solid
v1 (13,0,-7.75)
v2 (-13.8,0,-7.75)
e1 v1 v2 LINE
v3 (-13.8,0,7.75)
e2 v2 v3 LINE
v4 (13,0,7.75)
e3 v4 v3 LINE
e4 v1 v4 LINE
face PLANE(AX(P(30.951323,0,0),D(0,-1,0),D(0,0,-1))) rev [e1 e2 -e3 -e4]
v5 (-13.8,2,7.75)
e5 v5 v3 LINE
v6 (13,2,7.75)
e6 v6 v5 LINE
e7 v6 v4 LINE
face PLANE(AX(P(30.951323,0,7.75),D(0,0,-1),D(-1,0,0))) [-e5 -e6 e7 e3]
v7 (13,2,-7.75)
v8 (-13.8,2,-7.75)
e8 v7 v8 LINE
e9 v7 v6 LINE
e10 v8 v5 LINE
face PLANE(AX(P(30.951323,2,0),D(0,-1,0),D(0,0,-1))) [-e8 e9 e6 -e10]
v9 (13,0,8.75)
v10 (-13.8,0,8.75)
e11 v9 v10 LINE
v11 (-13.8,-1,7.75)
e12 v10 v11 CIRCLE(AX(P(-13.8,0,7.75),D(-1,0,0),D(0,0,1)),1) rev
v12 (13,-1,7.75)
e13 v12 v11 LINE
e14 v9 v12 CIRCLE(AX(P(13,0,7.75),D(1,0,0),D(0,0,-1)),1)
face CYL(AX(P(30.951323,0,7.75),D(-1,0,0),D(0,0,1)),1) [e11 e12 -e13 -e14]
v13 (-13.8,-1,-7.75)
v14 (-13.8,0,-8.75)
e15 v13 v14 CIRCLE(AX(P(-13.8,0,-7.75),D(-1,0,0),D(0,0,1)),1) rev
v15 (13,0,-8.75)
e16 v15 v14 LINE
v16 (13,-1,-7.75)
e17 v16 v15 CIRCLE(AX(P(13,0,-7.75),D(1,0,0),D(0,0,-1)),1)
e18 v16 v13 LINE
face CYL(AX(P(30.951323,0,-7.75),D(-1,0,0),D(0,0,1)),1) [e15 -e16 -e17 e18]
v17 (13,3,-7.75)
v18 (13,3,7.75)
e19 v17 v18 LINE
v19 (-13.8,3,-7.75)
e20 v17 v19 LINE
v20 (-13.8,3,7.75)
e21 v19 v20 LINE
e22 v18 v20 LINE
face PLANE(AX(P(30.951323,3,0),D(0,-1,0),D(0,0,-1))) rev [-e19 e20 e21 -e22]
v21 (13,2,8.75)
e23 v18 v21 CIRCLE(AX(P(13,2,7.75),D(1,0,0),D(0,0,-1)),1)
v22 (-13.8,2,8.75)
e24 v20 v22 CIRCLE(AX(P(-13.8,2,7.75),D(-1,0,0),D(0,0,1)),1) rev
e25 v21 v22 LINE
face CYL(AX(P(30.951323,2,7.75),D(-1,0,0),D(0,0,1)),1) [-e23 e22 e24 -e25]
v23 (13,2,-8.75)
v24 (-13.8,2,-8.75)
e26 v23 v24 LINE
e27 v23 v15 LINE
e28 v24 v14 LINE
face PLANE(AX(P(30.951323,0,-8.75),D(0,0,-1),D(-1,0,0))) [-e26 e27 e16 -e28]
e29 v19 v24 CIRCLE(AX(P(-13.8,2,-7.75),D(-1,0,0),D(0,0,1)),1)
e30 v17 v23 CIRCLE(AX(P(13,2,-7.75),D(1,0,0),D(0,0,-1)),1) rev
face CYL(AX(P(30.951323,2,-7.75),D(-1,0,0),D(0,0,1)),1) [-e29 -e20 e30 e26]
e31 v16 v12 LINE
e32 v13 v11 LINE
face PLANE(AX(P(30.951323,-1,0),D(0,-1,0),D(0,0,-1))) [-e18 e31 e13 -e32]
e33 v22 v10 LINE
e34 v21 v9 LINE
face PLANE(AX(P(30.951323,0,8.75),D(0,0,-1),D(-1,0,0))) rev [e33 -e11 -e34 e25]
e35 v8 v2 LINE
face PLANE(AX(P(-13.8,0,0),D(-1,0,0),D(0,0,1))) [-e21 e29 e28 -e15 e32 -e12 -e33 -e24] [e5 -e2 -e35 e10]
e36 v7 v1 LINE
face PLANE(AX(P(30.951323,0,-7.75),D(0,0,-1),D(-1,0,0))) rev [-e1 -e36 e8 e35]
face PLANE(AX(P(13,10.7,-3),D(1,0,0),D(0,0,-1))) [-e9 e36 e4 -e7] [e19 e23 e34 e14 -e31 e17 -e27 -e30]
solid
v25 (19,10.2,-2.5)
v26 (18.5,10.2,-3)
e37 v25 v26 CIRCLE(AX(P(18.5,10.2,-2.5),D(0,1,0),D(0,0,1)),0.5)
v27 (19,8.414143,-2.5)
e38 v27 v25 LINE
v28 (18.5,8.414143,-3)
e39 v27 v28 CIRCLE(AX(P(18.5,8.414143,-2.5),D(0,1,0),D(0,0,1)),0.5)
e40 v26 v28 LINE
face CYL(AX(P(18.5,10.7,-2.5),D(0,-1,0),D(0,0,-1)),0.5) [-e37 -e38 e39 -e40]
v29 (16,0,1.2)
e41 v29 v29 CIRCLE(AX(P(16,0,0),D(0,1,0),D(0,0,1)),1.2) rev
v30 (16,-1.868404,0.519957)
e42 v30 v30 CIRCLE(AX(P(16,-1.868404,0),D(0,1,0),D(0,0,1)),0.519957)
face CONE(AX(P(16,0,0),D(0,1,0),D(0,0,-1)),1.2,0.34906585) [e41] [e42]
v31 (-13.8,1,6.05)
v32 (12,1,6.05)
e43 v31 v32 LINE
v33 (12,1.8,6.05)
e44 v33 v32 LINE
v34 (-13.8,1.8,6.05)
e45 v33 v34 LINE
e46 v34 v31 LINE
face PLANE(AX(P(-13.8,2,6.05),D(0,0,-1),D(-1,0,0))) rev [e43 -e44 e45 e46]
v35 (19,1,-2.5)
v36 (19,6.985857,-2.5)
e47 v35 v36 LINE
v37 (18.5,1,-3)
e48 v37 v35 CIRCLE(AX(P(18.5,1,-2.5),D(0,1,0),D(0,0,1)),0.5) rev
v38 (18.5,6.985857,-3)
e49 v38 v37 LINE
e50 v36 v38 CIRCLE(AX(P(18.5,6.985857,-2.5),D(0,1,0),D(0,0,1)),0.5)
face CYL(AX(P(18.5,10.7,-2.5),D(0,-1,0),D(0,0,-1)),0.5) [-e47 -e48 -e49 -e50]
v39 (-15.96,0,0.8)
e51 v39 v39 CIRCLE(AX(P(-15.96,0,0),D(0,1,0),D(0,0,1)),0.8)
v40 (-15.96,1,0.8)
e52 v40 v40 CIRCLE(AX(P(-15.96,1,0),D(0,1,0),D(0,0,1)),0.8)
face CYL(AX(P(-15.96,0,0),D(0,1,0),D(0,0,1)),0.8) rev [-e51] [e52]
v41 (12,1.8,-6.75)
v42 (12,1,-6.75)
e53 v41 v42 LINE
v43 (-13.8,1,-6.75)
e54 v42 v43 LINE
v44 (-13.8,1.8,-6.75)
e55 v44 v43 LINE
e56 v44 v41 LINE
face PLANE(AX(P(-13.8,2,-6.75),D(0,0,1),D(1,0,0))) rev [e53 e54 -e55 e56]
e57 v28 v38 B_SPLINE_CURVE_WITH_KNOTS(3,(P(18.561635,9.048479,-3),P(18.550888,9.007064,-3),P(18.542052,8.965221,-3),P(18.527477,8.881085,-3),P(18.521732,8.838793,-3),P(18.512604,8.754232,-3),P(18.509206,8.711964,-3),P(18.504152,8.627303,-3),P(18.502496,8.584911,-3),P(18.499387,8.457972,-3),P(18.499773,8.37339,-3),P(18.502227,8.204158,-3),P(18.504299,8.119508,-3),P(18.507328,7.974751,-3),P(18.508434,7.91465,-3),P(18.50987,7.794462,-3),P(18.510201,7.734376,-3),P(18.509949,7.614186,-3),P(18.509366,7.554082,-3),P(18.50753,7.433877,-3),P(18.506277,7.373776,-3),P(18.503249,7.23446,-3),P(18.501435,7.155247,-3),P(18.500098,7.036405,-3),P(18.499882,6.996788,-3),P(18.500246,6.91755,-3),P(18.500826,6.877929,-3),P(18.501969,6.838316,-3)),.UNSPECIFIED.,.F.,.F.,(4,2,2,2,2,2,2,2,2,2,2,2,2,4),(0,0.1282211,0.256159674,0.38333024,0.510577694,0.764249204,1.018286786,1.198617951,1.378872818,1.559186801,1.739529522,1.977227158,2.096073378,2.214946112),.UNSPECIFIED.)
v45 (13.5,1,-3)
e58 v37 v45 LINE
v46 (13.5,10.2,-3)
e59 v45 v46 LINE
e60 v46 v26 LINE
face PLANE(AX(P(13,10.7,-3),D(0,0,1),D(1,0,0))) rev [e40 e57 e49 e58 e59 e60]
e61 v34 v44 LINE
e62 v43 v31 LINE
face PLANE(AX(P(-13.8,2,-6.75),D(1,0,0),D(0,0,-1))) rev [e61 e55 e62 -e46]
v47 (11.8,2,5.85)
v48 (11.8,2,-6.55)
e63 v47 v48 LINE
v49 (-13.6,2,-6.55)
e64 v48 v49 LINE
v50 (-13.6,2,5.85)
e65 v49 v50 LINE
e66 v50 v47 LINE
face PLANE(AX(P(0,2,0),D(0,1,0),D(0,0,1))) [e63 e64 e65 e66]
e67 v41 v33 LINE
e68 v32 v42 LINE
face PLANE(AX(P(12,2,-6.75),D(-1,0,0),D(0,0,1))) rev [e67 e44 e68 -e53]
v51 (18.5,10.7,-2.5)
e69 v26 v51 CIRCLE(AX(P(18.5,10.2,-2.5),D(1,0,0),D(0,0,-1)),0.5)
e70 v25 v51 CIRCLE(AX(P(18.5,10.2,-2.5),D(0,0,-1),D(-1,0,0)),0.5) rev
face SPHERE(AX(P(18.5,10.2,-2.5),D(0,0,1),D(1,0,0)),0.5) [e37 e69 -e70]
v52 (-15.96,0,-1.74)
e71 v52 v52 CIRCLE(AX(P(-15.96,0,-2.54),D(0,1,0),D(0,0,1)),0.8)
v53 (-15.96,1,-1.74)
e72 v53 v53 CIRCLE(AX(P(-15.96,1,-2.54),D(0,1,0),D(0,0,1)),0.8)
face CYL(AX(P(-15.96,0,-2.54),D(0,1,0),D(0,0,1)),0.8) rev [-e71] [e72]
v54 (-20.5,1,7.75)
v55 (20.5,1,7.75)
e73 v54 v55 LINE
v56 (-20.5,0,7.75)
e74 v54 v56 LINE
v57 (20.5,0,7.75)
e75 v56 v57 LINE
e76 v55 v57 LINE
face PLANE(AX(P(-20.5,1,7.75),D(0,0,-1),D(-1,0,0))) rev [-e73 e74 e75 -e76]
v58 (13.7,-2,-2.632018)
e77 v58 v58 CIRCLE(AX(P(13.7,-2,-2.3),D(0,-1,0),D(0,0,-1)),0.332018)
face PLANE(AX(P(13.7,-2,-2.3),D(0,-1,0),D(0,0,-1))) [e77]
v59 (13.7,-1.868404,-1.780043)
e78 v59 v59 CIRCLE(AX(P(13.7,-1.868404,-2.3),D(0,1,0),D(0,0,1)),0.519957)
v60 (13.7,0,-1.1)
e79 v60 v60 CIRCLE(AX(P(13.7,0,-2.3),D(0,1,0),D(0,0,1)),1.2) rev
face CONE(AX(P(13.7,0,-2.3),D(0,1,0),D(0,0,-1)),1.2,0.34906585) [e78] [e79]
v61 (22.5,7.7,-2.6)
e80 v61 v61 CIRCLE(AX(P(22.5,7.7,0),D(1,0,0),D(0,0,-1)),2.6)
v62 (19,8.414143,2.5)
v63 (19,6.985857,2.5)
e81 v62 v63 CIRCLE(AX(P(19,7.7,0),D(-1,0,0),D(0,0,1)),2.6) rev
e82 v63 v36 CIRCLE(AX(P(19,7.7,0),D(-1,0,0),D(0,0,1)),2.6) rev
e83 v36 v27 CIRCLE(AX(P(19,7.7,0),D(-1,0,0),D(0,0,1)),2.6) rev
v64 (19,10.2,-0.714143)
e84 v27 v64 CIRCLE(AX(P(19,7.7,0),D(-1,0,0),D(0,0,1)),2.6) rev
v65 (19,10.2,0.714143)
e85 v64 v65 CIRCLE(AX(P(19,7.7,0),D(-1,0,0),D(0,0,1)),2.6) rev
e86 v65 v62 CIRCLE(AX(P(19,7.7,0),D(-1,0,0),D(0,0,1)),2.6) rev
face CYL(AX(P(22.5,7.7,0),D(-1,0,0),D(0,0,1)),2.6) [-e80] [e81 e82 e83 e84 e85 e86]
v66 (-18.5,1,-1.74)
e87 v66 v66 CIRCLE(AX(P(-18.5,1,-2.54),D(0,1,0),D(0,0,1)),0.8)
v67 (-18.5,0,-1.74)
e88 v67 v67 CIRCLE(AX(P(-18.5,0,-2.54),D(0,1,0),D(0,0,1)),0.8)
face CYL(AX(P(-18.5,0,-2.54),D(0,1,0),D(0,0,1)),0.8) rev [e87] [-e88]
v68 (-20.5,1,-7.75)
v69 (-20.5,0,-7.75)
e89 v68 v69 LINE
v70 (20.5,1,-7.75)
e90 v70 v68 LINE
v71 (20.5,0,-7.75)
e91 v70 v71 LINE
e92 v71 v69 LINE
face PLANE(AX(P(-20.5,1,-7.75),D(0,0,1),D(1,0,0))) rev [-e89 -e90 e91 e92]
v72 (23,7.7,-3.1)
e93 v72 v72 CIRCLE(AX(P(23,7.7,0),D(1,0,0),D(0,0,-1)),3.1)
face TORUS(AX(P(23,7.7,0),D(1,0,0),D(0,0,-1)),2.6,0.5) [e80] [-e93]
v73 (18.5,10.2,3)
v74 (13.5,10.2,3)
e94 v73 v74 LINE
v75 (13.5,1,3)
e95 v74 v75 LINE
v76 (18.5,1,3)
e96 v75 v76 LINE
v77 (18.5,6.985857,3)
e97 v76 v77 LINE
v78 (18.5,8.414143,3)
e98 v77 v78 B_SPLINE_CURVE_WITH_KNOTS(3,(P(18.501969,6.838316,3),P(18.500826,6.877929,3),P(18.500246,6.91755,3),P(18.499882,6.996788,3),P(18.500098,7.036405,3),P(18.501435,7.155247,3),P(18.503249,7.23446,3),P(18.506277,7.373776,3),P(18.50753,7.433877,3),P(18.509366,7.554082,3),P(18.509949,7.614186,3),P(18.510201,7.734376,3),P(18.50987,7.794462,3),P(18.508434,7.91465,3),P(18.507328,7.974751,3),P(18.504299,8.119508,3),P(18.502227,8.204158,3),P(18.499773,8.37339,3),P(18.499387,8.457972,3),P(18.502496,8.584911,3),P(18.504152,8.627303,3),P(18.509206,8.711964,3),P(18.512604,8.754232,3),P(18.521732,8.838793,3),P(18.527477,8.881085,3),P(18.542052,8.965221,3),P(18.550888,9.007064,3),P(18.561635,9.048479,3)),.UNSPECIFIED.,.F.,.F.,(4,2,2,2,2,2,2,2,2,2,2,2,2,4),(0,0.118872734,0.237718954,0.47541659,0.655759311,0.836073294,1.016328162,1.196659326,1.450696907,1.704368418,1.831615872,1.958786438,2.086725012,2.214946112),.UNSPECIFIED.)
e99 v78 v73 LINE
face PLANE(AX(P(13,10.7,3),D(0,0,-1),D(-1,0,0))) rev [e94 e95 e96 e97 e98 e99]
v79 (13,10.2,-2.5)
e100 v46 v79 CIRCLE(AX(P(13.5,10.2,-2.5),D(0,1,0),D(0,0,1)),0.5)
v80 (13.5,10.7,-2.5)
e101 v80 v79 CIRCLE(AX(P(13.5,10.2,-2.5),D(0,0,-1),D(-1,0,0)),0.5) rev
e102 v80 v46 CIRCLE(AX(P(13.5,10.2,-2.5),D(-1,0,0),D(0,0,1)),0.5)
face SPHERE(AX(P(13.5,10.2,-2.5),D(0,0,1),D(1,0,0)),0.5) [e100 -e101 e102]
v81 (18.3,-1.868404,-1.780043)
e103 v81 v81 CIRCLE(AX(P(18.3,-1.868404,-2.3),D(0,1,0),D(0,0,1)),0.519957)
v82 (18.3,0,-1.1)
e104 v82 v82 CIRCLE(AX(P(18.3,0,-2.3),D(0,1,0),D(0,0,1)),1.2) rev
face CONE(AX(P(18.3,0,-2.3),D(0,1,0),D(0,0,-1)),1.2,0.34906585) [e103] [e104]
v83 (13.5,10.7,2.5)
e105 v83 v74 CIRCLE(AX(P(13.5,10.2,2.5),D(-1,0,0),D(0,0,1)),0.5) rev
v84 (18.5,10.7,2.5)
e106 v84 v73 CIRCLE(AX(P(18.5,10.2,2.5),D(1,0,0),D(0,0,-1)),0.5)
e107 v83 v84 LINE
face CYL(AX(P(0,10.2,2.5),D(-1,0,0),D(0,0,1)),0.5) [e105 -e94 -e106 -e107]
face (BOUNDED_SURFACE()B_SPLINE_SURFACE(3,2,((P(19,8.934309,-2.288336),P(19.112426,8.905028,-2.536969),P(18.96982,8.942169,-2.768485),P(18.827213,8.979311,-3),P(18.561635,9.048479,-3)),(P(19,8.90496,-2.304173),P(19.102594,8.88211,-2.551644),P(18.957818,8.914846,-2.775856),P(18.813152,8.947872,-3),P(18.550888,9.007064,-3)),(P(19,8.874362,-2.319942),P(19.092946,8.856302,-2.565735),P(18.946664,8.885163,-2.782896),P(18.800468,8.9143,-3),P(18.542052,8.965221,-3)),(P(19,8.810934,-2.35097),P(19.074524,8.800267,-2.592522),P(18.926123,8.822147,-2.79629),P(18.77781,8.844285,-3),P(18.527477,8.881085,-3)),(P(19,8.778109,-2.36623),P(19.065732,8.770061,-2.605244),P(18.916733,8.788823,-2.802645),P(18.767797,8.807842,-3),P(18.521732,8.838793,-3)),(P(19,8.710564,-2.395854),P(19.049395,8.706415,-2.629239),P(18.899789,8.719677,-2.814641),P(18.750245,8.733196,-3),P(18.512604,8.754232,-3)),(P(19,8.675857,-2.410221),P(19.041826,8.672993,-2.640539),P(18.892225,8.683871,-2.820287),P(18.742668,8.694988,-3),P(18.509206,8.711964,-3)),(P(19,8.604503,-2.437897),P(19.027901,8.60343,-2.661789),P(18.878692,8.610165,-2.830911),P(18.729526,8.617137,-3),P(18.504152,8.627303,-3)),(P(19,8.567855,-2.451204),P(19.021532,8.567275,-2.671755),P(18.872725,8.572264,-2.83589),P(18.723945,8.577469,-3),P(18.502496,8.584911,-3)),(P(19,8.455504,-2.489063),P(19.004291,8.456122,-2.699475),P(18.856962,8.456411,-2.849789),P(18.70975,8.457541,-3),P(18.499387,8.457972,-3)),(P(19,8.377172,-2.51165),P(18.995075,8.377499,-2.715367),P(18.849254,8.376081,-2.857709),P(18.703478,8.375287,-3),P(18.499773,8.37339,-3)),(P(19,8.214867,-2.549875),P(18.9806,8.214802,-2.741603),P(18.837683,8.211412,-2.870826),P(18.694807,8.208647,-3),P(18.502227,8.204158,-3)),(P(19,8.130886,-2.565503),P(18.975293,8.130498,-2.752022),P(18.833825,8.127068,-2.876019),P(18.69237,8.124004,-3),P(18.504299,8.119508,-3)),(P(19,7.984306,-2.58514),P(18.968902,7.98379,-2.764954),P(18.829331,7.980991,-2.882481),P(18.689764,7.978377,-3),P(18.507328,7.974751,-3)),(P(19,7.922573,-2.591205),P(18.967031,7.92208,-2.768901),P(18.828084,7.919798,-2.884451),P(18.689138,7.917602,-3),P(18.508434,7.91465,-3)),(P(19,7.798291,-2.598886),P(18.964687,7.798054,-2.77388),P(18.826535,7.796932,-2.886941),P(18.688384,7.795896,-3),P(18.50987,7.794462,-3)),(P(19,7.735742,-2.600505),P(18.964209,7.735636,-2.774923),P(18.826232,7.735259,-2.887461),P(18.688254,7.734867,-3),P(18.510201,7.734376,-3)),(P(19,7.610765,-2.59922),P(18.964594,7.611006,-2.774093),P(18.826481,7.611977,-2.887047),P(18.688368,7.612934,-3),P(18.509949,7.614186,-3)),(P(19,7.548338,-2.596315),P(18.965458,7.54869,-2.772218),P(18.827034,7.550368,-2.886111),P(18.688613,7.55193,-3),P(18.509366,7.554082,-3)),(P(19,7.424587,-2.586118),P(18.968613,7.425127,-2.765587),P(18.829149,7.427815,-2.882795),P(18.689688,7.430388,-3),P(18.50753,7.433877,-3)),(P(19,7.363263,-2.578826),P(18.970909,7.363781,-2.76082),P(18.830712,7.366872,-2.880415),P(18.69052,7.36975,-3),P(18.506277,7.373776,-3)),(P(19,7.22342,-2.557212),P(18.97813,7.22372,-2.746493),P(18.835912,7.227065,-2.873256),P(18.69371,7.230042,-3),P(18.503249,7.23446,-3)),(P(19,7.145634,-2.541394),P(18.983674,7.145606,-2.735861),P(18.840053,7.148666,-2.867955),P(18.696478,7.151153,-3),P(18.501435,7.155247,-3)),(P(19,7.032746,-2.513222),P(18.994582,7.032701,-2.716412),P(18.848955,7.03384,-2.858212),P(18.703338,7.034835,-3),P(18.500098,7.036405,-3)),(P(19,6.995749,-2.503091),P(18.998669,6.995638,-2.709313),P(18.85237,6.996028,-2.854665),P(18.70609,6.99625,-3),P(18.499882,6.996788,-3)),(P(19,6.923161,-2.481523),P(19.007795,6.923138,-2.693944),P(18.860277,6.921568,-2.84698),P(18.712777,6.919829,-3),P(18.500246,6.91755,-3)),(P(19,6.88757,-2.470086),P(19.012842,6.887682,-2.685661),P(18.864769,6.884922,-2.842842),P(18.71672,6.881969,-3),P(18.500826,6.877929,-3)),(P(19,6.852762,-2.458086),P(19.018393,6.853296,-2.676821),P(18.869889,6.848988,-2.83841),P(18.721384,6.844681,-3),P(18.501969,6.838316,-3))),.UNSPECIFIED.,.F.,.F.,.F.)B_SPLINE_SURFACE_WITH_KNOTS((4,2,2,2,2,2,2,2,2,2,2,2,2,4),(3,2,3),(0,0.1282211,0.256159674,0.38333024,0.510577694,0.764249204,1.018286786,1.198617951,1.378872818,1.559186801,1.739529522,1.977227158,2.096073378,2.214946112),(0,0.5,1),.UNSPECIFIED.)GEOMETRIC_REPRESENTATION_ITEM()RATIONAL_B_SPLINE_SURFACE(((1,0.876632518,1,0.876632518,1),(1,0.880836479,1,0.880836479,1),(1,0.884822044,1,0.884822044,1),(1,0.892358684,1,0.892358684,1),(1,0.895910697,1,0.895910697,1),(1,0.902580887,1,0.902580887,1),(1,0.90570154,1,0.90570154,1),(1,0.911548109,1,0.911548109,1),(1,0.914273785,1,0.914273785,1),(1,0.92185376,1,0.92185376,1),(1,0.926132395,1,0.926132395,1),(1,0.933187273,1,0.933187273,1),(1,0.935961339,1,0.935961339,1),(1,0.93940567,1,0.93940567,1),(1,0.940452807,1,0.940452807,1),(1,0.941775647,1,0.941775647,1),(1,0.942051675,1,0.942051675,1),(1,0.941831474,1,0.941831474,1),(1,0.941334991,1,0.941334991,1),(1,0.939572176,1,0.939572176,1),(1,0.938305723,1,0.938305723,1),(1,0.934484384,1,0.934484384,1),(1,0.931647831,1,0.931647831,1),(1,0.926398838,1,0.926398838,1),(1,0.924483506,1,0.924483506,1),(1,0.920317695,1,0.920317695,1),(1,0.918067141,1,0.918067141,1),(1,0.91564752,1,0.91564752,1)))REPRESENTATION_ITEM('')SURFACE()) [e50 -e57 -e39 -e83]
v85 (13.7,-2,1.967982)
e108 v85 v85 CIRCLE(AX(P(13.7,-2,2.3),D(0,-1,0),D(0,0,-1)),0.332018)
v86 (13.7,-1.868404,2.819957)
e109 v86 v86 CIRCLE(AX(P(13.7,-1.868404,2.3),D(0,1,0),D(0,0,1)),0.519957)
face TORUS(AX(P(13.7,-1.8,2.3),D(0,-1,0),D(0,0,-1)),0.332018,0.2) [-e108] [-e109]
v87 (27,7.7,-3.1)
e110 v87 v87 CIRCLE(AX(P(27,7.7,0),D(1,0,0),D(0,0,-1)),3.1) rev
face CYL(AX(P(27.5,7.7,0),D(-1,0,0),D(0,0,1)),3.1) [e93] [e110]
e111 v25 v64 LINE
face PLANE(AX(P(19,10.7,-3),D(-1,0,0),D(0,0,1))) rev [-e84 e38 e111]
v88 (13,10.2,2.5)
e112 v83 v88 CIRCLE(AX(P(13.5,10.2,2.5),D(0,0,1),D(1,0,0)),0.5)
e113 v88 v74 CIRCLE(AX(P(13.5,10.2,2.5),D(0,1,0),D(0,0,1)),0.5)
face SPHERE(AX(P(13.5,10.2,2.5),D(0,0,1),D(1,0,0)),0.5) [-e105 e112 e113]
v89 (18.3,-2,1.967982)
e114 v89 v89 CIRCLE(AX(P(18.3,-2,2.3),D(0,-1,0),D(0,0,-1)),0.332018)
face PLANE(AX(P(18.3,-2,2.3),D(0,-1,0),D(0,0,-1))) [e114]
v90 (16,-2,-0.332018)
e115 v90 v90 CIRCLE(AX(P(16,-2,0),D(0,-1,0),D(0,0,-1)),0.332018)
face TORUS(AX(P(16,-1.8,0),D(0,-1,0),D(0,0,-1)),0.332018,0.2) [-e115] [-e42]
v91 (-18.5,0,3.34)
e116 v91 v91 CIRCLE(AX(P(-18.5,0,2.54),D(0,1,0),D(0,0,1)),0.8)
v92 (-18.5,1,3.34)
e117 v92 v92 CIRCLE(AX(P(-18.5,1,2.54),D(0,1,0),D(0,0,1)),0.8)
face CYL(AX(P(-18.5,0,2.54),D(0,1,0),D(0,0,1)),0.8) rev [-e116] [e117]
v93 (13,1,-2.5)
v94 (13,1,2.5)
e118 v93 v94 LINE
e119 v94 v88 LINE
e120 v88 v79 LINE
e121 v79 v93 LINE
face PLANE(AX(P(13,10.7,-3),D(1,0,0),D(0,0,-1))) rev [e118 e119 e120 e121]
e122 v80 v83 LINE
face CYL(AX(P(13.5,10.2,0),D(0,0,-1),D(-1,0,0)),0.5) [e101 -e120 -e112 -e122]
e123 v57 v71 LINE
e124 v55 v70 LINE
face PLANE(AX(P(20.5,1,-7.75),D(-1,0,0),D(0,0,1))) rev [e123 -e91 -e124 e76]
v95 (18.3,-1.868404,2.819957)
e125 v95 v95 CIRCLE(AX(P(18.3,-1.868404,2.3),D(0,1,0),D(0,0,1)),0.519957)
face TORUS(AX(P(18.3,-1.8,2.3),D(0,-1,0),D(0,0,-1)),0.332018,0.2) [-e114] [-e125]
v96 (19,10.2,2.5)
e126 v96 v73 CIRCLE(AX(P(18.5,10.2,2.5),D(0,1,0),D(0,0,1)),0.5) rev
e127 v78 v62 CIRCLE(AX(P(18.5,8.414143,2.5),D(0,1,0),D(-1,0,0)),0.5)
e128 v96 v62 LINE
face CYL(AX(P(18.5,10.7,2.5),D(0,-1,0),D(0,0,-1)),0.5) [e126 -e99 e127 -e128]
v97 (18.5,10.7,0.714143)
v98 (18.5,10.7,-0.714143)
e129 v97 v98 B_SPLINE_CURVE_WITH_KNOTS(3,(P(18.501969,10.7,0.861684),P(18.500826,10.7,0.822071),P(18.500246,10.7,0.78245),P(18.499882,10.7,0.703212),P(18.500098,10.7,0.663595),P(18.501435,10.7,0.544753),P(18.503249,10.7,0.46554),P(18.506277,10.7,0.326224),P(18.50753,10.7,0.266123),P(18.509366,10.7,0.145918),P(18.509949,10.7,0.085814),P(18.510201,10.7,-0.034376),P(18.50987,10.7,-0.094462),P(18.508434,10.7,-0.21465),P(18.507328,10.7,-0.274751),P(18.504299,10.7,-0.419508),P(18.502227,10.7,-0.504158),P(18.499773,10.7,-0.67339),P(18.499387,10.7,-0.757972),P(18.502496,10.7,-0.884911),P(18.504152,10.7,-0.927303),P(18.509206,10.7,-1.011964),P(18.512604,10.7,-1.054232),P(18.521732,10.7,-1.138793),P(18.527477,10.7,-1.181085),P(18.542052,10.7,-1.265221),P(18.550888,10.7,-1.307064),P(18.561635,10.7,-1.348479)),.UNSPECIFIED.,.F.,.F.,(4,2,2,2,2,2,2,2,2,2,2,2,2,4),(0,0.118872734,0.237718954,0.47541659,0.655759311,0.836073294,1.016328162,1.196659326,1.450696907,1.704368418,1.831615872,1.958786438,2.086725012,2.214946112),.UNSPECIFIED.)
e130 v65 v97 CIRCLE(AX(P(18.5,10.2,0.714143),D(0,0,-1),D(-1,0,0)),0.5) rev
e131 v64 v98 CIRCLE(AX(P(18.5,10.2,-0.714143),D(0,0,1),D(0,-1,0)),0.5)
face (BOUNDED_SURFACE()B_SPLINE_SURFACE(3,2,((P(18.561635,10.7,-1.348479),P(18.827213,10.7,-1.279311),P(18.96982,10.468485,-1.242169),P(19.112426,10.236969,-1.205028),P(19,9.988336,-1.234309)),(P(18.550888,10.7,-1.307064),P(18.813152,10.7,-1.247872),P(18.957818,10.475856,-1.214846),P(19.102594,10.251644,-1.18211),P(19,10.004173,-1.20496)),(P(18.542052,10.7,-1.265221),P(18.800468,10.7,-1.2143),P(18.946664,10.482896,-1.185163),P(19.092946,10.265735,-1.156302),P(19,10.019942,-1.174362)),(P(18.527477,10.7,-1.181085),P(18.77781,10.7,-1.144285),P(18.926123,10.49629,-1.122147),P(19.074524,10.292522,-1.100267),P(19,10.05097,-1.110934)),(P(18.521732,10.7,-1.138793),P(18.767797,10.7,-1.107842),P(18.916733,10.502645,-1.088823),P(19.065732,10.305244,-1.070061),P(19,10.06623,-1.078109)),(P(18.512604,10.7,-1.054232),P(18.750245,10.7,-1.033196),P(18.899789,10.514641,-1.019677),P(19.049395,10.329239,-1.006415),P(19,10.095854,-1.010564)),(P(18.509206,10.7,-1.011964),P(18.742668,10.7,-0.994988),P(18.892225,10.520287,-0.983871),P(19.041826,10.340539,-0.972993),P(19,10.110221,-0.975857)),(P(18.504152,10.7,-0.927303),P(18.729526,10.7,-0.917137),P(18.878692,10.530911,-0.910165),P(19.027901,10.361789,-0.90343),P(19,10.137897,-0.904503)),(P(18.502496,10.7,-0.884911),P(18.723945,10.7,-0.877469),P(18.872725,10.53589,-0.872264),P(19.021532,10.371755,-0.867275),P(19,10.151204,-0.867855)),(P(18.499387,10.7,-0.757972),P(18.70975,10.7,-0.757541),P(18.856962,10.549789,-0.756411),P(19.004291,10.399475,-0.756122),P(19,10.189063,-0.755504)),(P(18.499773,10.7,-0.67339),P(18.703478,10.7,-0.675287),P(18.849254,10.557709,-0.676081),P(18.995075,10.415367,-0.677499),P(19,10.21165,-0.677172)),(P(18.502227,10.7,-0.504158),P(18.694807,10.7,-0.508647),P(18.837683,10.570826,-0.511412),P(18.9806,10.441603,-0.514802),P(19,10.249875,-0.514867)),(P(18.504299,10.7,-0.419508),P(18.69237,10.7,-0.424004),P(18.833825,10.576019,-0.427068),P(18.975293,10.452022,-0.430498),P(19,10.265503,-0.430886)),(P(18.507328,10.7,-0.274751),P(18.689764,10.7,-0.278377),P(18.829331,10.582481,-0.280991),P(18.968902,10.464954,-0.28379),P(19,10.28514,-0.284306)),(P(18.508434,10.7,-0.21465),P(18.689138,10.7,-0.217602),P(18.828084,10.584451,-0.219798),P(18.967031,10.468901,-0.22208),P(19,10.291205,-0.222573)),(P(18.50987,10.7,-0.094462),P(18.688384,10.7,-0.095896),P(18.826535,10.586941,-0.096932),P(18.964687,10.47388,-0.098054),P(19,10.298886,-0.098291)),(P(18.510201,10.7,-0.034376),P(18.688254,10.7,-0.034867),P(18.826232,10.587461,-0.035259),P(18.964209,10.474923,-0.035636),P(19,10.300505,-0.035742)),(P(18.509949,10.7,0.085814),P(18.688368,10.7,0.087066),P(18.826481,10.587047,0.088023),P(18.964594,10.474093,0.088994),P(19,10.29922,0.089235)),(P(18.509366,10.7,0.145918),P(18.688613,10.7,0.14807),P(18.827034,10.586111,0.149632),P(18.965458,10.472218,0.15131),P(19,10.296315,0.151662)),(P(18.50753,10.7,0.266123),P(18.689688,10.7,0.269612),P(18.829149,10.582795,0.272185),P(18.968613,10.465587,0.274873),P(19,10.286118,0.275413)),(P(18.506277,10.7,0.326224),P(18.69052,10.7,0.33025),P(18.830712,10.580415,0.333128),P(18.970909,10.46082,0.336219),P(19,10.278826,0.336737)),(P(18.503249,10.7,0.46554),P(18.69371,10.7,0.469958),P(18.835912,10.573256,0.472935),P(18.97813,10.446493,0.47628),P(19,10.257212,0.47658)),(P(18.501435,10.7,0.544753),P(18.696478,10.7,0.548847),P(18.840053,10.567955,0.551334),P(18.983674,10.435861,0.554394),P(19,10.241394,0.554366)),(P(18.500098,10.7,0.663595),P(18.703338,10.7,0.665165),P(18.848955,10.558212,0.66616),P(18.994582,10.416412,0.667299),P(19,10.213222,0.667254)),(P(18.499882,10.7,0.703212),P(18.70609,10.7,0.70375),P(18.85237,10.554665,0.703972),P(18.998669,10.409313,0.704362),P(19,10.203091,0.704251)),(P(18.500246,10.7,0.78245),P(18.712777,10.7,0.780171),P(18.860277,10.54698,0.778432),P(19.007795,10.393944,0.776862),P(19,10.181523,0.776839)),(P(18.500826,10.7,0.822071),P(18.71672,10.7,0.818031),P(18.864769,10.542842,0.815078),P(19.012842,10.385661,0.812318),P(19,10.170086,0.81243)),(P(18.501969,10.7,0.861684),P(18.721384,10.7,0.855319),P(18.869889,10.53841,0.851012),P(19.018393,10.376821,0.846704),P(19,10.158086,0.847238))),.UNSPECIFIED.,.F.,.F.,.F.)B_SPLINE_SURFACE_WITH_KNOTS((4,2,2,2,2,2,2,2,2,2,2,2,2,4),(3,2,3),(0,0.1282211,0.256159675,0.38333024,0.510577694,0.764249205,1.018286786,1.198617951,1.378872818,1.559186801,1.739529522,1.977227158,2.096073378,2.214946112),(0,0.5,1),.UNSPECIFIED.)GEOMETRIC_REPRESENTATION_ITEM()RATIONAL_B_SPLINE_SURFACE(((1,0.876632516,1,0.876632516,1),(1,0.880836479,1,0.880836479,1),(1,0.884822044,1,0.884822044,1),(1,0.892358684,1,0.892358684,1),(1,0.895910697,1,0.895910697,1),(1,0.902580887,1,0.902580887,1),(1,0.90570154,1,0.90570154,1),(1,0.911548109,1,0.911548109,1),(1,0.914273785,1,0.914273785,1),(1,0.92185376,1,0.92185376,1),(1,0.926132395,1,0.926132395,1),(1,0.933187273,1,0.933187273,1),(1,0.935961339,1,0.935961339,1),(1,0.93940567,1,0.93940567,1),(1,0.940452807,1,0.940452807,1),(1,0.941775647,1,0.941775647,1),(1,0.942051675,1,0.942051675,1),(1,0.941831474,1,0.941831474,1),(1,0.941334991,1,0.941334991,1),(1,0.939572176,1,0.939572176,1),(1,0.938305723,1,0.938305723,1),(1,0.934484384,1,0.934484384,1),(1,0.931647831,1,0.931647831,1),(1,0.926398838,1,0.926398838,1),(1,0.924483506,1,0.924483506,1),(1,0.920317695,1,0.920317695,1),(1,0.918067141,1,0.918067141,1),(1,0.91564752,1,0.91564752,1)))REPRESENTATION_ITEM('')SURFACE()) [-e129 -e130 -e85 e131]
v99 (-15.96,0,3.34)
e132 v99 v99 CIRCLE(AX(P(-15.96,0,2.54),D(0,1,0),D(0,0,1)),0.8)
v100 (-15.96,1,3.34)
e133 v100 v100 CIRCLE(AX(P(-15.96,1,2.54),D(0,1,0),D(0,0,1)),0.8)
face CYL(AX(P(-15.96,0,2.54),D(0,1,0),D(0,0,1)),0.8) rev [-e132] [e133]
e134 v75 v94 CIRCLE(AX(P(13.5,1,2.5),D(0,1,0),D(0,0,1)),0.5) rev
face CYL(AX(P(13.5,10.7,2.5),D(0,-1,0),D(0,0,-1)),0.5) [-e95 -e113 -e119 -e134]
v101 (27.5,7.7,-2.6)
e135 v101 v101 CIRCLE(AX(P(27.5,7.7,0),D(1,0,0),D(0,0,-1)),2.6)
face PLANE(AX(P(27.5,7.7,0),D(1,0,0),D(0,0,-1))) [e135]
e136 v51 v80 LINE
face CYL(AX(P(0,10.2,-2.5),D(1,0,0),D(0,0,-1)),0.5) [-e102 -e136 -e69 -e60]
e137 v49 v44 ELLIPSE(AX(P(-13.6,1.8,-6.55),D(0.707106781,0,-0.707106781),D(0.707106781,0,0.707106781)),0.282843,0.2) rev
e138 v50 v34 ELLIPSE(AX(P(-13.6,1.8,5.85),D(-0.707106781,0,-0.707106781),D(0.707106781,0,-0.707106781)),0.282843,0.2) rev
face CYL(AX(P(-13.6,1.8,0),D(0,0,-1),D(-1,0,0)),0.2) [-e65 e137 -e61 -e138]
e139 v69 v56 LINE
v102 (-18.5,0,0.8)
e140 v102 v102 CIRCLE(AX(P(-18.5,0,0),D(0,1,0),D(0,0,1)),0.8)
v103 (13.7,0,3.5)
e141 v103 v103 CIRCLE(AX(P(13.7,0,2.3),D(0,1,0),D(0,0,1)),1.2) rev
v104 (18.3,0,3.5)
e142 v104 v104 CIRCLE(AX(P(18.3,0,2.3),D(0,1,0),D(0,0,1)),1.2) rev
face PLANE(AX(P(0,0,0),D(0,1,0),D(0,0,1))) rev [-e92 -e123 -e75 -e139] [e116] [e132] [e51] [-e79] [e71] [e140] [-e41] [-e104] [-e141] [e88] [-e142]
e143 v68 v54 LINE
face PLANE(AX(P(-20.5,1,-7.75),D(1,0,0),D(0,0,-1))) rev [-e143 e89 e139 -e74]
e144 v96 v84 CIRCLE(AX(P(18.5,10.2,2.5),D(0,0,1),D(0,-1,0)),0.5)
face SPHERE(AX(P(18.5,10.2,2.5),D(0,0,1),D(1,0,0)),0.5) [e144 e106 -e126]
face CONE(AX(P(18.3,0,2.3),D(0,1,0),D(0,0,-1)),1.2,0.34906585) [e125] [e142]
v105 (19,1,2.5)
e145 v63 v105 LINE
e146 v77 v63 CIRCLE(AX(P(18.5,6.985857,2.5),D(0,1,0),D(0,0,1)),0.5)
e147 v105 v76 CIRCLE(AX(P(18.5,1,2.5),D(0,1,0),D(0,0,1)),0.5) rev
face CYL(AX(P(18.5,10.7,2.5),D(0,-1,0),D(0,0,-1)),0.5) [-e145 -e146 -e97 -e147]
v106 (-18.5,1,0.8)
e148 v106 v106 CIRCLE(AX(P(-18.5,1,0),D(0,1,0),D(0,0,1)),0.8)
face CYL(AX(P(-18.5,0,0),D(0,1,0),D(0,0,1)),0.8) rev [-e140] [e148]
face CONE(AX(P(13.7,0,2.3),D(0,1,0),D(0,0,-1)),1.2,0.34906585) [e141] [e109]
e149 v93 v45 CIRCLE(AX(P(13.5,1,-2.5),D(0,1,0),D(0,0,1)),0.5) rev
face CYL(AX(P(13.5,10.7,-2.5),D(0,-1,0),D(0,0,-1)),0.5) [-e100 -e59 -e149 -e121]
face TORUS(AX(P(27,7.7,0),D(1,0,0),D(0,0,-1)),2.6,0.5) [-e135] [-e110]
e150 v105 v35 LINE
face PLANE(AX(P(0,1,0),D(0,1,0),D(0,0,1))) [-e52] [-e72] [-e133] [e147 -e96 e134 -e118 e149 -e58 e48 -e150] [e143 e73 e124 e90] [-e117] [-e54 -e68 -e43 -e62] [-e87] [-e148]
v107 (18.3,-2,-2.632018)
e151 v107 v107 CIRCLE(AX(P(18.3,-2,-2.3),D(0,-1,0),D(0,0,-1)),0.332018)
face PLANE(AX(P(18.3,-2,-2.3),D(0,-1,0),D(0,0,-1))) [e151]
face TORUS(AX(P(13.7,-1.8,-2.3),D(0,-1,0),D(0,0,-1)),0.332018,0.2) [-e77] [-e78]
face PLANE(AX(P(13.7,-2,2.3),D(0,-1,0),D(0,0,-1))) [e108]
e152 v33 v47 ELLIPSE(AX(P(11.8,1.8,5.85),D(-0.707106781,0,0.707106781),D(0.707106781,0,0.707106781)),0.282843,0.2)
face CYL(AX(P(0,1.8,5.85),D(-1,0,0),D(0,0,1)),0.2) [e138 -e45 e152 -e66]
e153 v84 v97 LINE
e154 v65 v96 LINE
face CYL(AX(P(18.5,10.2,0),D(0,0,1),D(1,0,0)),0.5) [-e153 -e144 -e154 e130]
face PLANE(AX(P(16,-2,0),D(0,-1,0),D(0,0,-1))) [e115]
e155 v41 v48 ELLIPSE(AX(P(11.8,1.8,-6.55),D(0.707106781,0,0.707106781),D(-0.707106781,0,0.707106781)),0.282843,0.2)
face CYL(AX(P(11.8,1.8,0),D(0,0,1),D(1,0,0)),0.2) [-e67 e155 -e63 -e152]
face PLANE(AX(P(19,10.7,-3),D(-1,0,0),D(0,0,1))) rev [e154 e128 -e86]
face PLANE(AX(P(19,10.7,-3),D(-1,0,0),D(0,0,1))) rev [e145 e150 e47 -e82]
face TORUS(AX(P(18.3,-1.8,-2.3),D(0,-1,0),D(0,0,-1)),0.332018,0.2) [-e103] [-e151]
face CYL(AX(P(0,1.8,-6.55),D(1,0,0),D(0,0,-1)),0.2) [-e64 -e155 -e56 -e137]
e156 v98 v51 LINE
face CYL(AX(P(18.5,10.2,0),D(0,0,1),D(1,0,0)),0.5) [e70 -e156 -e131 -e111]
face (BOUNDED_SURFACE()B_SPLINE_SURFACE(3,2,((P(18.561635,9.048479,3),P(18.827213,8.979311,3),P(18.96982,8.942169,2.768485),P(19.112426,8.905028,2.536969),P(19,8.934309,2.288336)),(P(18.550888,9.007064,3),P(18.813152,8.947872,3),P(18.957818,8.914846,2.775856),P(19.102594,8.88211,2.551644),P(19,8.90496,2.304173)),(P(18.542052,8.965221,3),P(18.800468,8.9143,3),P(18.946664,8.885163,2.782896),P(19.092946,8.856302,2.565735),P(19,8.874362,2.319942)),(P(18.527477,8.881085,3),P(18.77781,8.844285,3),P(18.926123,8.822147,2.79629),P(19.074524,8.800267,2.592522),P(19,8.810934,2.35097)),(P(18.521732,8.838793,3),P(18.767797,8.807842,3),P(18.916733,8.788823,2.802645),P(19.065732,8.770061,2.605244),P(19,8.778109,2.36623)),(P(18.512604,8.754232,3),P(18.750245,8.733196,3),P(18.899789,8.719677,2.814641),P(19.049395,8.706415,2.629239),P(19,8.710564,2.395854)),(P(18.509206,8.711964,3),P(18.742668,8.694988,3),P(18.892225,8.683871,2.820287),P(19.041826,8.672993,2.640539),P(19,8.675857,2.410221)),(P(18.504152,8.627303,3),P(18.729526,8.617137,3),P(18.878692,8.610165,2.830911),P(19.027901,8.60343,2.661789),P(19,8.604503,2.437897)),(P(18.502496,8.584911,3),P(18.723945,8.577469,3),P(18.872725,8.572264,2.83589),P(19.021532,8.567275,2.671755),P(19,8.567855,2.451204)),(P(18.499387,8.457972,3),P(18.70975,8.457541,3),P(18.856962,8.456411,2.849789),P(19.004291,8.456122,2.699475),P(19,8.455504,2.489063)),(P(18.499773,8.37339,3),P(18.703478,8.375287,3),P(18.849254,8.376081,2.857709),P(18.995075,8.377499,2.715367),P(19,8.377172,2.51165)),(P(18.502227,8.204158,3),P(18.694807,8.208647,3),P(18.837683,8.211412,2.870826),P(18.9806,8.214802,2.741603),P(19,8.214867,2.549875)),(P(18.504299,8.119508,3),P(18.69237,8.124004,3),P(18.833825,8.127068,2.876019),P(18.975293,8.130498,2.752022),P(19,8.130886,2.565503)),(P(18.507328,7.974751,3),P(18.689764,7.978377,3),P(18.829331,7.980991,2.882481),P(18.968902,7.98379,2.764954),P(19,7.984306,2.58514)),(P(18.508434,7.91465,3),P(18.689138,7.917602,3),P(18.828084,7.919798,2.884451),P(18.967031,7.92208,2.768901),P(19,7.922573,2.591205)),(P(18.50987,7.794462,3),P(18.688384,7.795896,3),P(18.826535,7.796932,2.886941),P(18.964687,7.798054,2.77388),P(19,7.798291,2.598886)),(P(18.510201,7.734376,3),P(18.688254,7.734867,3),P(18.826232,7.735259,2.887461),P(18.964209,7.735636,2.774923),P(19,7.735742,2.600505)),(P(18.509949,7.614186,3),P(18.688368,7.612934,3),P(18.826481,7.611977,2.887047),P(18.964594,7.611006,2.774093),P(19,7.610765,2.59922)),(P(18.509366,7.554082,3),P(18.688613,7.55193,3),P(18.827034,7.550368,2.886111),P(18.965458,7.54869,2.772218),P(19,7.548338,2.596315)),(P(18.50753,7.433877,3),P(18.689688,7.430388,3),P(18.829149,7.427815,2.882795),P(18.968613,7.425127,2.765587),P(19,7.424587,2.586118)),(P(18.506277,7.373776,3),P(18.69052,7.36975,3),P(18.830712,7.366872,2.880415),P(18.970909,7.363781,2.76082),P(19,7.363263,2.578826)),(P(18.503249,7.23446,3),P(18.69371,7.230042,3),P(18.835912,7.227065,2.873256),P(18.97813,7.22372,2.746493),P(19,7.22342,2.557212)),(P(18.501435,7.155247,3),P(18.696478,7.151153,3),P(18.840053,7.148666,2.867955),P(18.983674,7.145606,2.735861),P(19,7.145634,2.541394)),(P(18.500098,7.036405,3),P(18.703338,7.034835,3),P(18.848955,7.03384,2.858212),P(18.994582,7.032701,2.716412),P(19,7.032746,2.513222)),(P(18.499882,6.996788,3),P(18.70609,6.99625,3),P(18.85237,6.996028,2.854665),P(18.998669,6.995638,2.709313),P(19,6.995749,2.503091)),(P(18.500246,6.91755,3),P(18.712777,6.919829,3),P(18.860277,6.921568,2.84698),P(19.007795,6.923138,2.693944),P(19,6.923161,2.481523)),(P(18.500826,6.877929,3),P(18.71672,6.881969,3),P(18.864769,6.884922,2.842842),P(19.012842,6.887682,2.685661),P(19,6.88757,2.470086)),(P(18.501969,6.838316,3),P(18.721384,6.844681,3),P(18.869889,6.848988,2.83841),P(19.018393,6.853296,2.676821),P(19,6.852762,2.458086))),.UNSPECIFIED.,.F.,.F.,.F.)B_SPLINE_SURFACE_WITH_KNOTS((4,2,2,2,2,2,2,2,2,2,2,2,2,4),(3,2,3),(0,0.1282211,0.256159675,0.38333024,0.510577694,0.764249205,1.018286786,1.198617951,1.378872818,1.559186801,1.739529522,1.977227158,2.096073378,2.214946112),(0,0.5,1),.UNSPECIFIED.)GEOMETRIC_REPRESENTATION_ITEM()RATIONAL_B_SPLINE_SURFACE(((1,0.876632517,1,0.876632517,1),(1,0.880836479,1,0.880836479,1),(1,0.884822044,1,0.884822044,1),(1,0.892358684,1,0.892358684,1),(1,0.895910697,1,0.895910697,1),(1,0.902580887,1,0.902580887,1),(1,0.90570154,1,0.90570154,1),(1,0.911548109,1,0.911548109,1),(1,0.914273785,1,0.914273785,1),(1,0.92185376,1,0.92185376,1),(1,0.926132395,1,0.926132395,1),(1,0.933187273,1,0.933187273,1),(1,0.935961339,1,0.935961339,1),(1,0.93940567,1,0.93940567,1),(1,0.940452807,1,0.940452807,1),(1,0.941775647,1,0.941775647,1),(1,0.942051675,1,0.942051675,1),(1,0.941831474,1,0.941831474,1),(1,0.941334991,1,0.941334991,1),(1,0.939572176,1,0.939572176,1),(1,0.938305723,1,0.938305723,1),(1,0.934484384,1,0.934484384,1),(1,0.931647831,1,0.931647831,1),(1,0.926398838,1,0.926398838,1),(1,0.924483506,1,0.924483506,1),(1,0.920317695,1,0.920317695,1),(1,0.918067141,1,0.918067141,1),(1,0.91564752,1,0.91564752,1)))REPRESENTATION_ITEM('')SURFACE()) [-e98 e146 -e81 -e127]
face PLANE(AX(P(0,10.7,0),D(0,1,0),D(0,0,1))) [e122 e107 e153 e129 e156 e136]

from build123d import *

# Parameters (mm, degrees)
SKETCH_1_W                = 41
SKETCH_1_H                = 15.5
EXTRUDE_1_DEPTH           = 1
SKETCH_2_W                = 6
SKETCH_2_H                = 6
EXTRUDE_2_DEPTH           = 9.7
SKETCH_3_R                = 2.6
EXTRUDE_3_DEPTH           = 3.5
SKETCH_4_R                = 0.8
CUT_EXTRUDE_1_DEPTH       = 26.698297609
SKETCH_5_R                = 3.1
EXTRUDE_4_DEPTH           = 5
FILLET_1_R                = 0.5
FILLET_2_R                = 0.5
SKETCH_6_R                = 1.2
EXTRUDE_5_DEPTH           = 2
EXTRUDE_5_DRAFT           = 20
EXTRUDE_5_PROFILE_2_DEPTH = 2
EXTRUDE_5_PROFILE_2_DRAFT = 20
EXTRUDE_5_PROFILE_3_DEPTH = 2
EXTRUDE_5_PROFILE_3_DRAFT = 20
EXTRUDE_5_PROFILE_4_DEPTH = 2
EXTRUDE_5_PROFILE_4_DRAFT = 20
EXTRUDE_5_PROFILE_5_DEPTH = 2
EXTRUDE_5_PROFILE_5_DRAFT = 20
FILLET_3_R                = 0.2
SKETCH_7_W                = 25.8
SKETCH_7_H                = 12.8
EXTRUDE_6_DEPTH           = 1
FILLET_4_R                = 0.2
SKETCH_8_W                = 15.5
SKETCH_8_H                = 2
EXTRUDE_7_DEPTH           = 26.8


with BuildPart() as part:
    # Эскиз1 → Бобышка-Вытянуть1 (new body)
    with BuildSketch(Plane(origin=(0, 0, 0), x_dir=(1, 0, 0), z_dir=(0, 1, 0))):
        Rectangle(SKETCH_1_W, SKETCH_1_H)
    extrude(amount=EXTRUDE_1_DEPTH)

    # Эскиз2 → Бобышка-Вытянуть2 (add)
    with BuildSketch(Plane(origin=(0, 1, 0), x_dir=(1, 0, 0), z_dir=(0, 1, 0))):
        with Locations((16, 0)):
            Rectangle(SKETCH_2_W, SKETCH_2_H)
    extrude(amount=EXTRUDE_2_DEPTH)

    # Эскиз3 → Бобышка-Вытянуть3 (add)
    with BuildSketch(Plane(origin=(19, 0, 0), x_dir=(0, 0, -1), z_dir=(1, 0, 0))):
        with Locations(Location((0, 7.7, 0), (0, 0, 180))):
            Circle(SKETCH_3_R)
    extrude(amount=EXTRUDE_3_DEPTH)

    # Эскиз4 → Вырез-Вытянуть1 (cut, through all)
    with BuildSketch(Plane(origin=(0, 1, 0), x_dir=(1, 0, 0), z_dir=(0, 1, 0))):
        with Locations(Location((-18.5, -2.54, 0), (0, 0, 270))):
            Circle(SKETCH_4_R)
        with Locations(Location((-18.5, 0, 0), (0, 0, 270))):
            Circle(SKETCH_4_R)
        with Locations(Location((-18.5, 2.54, 0), (0, 0, 270))):
            Circle(SKETCH_4_R)
        with Locations(Location((-15.96, 2.54, 0), (0, 0, 270))):
            Circle(SKETCH_4_R)
        with Locations(Location((-15.96, 0, 0), (0, 0, 270))):
            Circle(SKETCH_4_R)
        with Locations(Location((-15.96, -2.54, 0), (0, 0, 270))):
            Circle(SKETCH_4_R)
    extrude(amount=-CUT_EXTRUDE_1_DEPTH, mode=Mode.SUBTRACT)

    # Эскиз5 → Бобышка-Вытянуть4 (add)
    with BuildSketch(Plane(origin=(22.5, 0, 0), x_dir=(0, 0, -1), z_dir=(1, 0, 0))):
        with Locations((0, 7.7)):
            Circle(SKETCH_5_R)
    extrude(amount=EXTRUDE_4_DEPTH)

    # Скругление1
    fillet_1_edges = [part.edges().sort_by_distance(p)[0] for p in [
        (22.5, 7.7, 3.1),
        (27.5, 7.7, 3.1),
    ]]
    fillet(fillet_1_edges, radius=FILLET_1_R - 0.0001)  # a hair under: the kernel refuses the full size

    # Скругление2
    fillet_2_edges = [part.edges().sort_by_distance(p)[0] for p in [
        (13, 5.85, -3),
        (13, 5.85, 3),
        (19, 5.85, 3),
        (19, 5.85, -3),
        (13, 10.7, 0),
        (16, 10.7, 3),
        (19, 10.7, 0),
        (16, 10.7, -3),
    ]]
    fillet(fillet_2_edges, radius=FILLET_2_R)


with BuildPart() as extrude_5_tool:
    # Эскиз6 → Бобышка-Вытянуть5 (with draft: the straight prism first)
    with BuildSketch(Plane.XZ):
        with Locations((13.7, 2.3)):
            Circle(SKETCH_6_R)
    extrude(amount=EXTRUDE_5_DEPTH)
    # Бобышка-Вытянуть5: the draft: its side faces are tilted about the plane it starts from
    extrude_5_sides = [extrude_5_tool.faces().sort_by_distance(p)[0] for p in [
        (12.5, -1, 2.3),
    ]]
    draft(extrude_5_sides, Plane.XZ, EXTRUDE_5_DRAFT)


with BuildPart() as part_1:
    add(part.part)

    # Бобышка-Вытянуть5: add extrude_5_tool
    add(extrude_5_tool.part)


with BuildPart() as extrude_5_profile_2_tool:
    # Эскиз6 → Бобышка-Вытянуть5 profile 2 (with draft: the straight prism first)
    with BuildSketch(Plane.XZ):
        with Locations((18.3, 2.3)):
            Circle(SKETCH_6_R)
    extrude(amount=EXTRUDE_5_PROFILE_2_DEPTH)
    # Бобышка-Вытянуть5 profile 2: the draft: its side faces are tilted about the plane it starts from
    extrude_5_profile_2_sides = [extrude_5_profile_2_tool.faces().sort_by_distance(p)[0] for p in [
        (17.1, -1, 2.3),
    ]]
    draft(extrude_5_profile_2_sides, Plane.XZ, EXTRUDE_5_PROFILE_2_DRAFT)


with BuildPart() as part_2:
    add(part_1.part)

    # Бобышка-Вытянуть5 profile 2: add extrude_5_profile_2_tool
    add(extrude_5_profile_2_tool.part)


with BuildPart() as extrude_5_profile_3_tool:
    # Эскиз6 → Бобышка-Вытянуть5 profile 3 (with draft: the straight prism first)
    with BuildSketch(Plane.XZ):
        with Locations((18.3, -2.3)):
            Circle(SKETCH_6_R)
    extrude(amount=EXTRUDE_5_PROFILE_3_DEPTH)
    # Бобышка-Вытянуть5 profile 3: the draft: its side faces are tilted about the plane it starts from
    extrude_5_profile_3_sides = [extrude_5_profile_3_tool.faces().sort_by_distance(p)[0] for p in [
        (17.1, -1, -2.3),
    ]]
    draft(extrude_5_profile_3_sides, Plane.XZ, EXTRUDE_5_PROFILE_3_DRAFT)


with BuildPart() as part_3:
    add(part_2.part)

    # Бобышка-Вытянуть5 profile 3: add extrude_5_profile_3_tool
    add(extrude_5_profile_3_tool.part)


with BuildPart() as extrude_5_profile_4_tool:
    # Эскиз6 → Бобышка-Вытянуть5 profile 4 (with draft: the straight prism first)
    with BuildSketch(Plane.XZ):
        with Locations((16, 0)):
            Circle(SKETCH_6_R)
    extrude(amount=EXTRUDE_5_PROFILE_4_DEPTH)
    # Бобышка-Вытянуть5 profile 4: the draft: its side faces are tilted about the plane it starts from
    extrude_5_profile_4_sides = [extrude_5_profile_4_tool.faces().sort_by_distance(p)[0] for p in [
        (14.8, -1, 0),
    ]]
    draft(extrude_5_profile_4_sides, Plane.XZ, EXTRUDE_5_PROFILE_4_DRAFT)


with BuildPart() as part_4:
    add(part_3.part)

    # Бобышка-Вытянуть5 profile 4: add extrude_5_profile_4_tool
    add(extrude_5_profile_4_tool.part)


with BuildPart() as extrude_5_profile_5_tool:
    # Эскиз6 → Бобышка-Вытянуть5 profile 5 (with draft: the straight prism first)
    with BuildSketch(Plane.XZ):
        with Locations((13.7, -2.3)):
            Circle(SKETCH_6_R)
    extrude(amount=EXTRUDE_5_PROFILE_5_DEPTH)
    # Бобышка-Вытянуть5 profile 5: the draft: its side faces are tilted about the plane it starts from
    extrude_5_profile_5_sides = [extrude_5_profile_5_tool.faces().sort_by_distance(p)[0] for p in [
        (12.5, -1, -2.3),
    ]]
    draft(extrude_5_profile_5_sides, Plane.XZ, EXTRUDE_5_PROFILE_5_DRAFT)


with BuildPart() as part_5:
    add(part_4.part)

    # Бобышка-Вытянуть5 profile 5: add extrude_5_profile_5_tool
    add(extrude_5_profile_5_tool.part)

    # Скругление3
    fillet_3_edges = [part_5.edges().sort_by_distance(p)[0] for p in [
        (17.827940469, -2, 2.3),
        (13.227940469, -2, 2.3),
        (17.827940469, -2, -2.3),
        (15.527940469, -2, 0),
        (13.227940469, -2, -2.3),
    ]]
    fillet(fillet_3_edges, radius=FILLET_3_R)

    # Эскиз7 → Бобышка-Вытянуть6 (add)
    with BuildSketch(Plane(origin=(0, 1, 0), x_dir=(1, 0, 0), z_dir=(0, 1, 0))):
        with Locations((-0.9, 0.35)):
            Rectangle(SKETCH_7_W, SKETCH_7_H)
    extrude(amount=EXTRUDE_6_DEPTH)

    # Скругление4
    fillet_4_edges = [part_5.edges().sort_by_distance(p)[0] for p in [
        (12, 2, -0.35),
        (-0.9, 2, -6.75),
        (-13.8, 2, -0.35),
        (-0.9, 2, 6.05),
    ]]
    fillet(fillet_4_edges, radius=FILLET_4_R)


with BuildPart() as body_2:
    # Эскиз8 → Бобышка-Вытянуть7 (new body)
    with BuildSketch(Plane.ZY.offset(13.8)):
        with BuildLine():
            Line((-7.75, 3), (7.75, 3))
            ThreePointArc((7.75, 3), (8.457106781, 2.707106781), (8.75, 2))
            Line((8.75, 2), (8.75, 0))
            ThreePointArc((8.75, 0), (8.457106781, -0.707106781), (7.75, -1))
            Line((7.75, -1), (-7.75, -1))
            ThreePointArc((-7.75, -1), (-8.457106781, -0.707106781), (-8.75, 0))
            Line((-8.75, 0), (-8.75, 2))
            ThreePointArc((-8.75, 2), (-8.457106781, 2.707106781), (-7.75, 3))
        make_face()
        with Locations((0, 1)):
            Rectangle(SKETCH_8_W, SKETCH_8_H, mode=Mode.SUBTRACT)
    extrude(amount=-EXTRUDE_7_DEPTH)


solid = Compound([part_5.part, body_2.part])
